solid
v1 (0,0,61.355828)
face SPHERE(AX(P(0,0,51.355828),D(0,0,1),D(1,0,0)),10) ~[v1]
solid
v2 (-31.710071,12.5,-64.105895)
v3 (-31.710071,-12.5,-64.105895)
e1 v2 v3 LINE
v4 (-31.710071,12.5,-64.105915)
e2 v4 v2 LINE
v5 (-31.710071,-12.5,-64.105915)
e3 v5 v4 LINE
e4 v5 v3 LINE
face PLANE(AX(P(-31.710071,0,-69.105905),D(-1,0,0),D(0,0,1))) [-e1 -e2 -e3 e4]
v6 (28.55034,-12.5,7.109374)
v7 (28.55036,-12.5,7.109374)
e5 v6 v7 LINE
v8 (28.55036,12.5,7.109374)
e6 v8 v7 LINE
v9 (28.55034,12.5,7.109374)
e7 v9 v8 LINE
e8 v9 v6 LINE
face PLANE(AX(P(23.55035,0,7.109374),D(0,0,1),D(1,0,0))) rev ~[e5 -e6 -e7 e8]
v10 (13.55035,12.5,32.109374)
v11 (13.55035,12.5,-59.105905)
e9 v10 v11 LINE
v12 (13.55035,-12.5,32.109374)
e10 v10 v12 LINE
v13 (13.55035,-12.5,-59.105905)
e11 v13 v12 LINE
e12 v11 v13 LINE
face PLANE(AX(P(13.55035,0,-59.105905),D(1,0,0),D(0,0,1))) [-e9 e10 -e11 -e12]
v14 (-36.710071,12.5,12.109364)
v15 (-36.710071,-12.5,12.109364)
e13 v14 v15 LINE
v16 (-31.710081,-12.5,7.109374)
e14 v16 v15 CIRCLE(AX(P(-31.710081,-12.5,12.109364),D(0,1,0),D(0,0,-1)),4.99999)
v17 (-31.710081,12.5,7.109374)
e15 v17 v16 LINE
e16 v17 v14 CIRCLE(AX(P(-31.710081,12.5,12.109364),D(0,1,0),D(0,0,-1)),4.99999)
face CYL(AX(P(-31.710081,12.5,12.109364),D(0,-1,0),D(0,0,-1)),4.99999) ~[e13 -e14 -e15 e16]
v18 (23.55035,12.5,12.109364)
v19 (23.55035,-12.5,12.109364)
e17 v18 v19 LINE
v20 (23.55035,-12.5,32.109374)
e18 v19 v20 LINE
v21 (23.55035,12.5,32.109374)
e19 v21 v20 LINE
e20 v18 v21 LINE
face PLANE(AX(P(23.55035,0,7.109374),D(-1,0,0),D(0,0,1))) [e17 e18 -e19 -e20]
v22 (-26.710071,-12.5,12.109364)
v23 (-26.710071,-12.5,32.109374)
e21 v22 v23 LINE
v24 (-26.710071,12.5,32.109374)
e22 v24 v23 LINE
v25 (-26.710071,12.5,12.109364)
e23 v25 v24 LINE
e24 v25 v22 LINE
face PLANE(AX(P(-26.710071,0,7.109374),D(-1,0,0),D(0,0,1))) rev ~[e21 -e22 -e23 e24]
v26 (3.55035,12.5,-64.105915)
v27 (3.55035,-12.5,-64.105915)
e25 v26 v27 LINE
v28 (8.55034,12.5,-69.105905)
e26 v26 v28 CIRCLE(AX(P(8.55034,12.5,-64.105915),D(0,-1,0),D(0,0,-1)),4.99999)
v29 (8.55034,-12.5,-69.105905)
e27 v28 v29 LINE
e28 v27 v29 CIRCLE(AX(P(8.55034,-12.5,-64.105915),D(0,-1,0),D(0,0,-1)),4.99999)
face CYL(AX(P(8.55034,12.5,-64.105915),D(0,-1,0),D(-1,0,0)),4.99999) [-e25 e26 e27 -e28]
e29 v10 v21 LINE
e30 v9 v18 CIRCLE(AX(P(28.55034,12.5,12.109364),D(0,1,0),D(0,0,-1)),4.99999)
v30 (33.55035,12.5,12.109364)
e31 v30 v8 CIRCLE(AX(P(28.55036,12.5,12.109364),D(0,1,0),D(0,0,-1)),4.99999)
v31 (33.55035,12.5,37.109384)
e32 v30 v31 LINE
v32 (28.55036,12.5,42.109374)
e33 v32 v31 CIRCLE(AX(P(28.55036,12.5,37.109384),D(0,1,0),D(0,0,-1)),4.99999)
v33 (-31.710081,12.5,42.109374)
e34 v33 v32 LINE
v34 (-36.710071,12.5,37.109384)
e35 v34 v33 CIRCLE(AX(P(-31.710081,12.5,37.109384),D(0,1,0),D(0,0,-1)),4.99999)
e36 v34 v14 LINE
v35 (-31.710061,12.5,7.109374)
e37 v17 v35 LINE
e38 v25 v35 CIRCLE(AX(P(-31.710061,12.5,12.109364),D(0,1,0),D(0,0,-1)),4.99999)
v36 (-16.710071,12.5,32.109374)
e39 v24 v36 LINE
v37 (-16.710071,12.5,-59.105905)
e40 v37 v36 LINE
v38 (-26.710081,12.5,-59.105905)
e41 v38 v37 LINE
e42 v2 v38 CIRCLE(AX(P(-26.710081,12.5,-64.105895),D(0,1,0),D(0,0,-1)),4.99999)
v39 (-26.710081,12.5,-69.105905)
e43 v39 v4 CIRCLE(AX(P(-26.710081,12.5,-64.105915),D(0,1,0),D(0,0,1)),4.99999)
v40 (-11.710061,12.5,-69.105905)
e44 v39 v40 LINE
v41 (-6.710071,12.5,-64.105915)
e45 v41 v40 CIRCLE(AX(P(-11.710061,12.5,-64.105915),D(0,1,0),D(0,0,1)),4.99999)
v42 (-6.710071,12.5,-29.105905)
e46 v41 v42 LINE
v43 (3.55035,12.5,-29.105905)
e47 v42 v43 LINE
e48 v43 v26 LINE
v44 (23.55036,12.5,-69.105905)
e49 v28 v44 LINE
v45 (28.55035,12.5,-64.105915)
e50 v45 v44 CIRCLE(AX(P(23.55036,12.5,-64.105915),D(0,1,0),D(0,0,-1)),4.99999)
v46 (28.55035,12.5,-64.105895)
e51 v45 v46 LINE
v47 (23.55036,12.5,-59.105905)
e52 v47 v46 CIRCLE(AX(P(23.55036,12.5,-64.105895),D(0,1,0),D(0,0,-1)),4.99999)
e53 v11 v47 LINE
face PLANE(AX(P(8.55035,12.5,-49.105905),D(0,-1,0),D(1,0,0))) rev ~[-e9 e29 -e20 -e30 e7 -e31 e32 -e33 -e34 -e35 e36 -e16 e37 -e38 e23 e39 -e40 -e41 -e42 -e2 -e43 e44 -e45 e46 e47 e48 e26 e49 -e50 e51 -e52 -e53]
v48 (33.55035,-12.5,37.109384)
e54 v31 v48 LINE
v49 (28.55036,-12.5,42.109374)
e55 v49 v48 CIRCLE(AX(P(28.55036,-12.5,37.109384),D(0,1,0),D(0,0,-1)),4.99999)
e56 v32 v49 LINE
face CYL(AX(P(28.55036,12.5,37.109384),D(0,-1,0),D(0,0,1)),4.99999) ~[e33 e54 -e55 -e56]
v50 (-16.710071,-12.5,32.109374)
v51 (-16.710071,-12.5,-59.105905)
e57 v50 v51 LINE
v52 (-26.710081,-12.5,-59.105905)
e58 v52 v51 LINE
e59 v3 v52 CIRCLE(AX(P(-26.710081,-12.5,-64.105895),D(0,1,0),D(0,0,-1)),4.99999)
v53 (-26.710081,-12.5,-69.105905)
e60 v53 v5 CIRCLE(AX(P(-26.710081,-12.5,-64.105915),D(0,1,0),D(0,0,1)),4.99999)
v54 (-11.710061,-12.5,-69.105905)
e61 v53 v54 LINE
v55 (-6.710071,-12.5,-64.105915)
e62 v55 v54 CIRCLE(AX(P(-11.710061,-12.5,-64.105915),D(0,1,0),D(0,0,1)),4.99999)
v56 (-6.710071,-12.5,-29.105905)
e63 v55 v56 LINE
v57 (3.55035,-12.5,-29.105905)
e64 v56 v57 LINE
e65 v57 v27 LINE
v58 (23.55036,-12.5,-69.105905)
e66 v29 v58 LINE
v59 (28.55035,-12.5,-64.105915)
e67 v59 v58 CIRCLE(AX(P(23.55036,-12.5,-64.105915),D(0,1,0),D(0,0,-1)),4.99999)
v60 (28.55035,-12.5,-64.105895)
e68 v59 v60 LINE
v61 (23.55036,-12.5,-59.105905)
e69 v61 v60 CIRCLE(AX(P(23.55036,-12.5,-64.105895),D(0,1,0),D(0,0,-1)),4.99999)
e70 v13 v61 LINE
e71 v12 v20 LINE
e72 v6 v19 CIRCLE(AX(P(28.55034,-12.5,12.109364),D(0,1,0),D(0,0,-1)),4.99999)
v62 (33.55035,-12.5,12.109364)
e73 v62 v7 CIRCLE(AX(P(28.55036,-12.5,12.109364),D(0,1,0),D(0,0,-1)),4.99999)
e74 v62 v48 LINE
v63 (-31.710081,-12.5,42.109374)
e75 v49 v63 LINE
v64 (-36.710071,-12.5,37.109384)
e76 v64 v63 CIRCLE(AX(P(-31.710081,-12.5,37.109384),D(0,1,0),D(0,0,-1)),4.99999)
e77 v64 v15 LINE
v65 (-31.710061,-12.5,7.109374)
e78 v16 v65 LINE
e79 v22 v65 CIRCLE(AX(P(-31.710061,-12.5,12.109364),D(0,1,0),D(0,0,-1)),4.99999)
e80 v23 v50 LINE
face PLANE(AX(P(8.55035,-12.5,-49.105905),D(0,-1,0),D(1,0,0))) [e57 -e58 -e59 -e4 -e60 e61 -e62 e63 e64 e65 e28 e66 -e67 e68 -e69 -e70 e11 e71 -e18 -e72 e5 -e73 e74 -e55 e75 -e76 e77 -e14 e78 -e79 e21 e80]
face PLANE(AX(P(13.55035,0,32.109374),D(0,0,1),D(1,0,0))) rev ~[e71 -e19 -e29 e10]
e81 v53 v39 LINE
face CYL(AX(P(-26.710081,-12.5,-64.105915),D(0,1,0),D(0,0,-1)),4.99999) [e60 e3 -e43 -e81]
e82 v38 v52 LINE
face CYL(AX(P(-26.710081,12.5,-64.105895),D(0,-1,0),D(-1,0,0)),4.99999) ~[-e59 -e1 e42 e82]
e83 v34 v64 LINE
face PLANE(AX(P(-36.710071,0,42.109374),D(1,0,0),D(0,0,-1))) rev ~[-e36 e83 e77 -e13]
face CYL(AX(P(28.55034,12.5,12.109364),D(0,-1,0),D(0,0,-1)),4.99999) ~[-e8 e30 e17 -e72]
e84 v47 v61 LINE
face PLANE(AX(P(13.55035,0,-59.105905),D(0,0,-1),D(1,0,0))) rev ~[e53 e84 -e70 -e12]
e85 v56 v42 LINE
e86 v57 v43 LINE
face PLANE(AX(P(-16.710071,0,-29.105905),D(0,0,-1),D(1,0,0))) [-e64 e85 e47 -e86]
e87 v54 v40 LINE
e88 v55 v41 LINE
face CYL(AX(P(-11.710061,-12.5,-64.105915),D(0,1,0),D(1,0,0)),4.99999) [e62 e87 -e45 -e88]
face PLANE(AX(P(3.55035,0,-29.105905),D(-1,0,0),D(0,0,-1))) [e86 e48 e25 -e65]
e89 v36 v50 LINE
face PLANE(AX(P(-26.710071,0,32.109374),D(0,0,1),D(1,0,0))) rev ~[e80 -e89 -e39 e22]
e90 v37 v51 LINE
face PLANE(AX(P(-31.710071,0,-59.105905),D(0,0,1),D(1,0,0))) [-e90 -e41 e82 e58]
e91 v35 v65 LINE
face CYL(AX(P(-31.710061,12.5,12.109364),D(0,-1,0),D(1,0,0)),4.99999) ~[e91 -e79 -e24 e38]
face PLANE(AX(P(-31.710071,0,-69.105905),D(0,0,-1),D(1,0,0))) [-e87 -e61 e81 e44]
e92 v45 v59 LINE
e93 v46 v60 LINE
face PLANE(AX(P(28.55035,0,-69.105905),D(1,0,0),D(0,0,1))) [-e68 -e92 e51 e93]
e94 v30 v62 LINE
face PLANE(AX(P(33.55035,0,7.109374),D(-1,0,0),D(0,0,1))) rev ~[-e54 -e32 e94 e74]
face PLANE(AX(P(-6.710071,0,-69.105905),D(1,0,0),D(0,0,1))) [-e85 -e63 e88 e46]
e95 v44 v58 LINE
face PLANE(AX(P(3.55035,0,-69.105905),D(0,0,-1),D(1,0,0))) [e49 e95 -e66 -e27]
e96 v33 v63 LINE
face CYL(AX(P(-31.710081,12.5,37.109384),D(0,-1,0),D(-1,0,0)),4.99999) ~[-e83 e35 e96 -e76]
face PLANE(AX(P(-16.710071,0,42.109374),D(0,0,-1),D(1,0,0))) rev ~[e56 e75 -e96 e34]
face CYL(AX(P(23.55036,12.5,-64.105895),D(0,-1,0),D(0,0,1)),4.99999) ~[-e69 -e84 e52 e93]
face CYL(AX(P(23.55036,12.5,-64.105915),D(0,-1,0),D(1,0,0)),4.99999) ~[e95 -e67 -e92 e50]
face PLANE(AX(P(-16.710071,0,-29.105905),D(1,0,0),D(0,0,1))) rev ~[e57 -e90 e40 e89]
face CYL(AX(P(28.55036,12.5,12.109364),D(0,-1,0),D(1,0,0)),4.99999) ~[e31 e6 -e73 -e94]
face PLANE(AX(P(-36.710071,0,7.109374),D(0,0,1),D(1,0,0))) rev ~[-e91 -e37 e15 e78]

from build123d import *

# Parameters (mm, degrees)
F0_W          = 30.2604204044
F0_H          = 71.2152794003
F1_DEPTH      = 12.5
F1_DEPTH_BACK = 12.5
F4_W          = 15
F4_H          = 10
F4_W_2        = 10
F4_H_2        = 25
F5_DEPTH      = 12.5
F5_DEPTH_BACK = 12.5
F6_R          = 4.99999


# Not quite as in the source:
# - a fillet or chamfer is up to 0.001 mm smaller than in the source, because OpenCascade refuses the exact size


with BuildPart() as f1:
    # F0 (on Front) → F1 (new body, two sides)
    with BuildSketch(Plane.XZ) as f1_sk:
        with Locations((-1.579860691, 6.5017342567)):
            Rectangle(F0_W, F0_H)
    extrude(amount=F1_DEPTH)
    extrude(f1_sk.sketch, amount=-F1_DEPTH_BACK)

    # F4 (on Front) → F5 (join, two sides)
    with BuildSketch(Plane.XZ) as f5_sk:
        Polygon((13.5503495112, -29.1059054434), (3.5503495112, -29.1059054434), (3.5503495112, -69.1059054434), (13.5503495112, -69.1059054434), (13.5503495112, -59.1059054434), align=None)
        with Locations((21.0503495112, -64.1059054434)):
            Rectangle(F4_W, F4_H)
        Polygon((-6.7100708932, -69.1059054434), (-6.7100708932, -29.1059054434), (-16.7100708932, -29.1059054434), (-16.7100708932, -59.1059054434), (-16.7100708932, -69.1059054434), align=None)
        with Locations((-24.2100708932, -64.1059054434)):
            Rectangle(F4_W, F4_H)
        Polygon((-16.7100708932, 32.1093739569), (-16.7100708932, 42.1093739569), (-36.7100708932, 42.1093739569), (-36.7100708932, 32.1093739569), (-26.7100708932, 32.1093739569), align=None)
        with Locations((-31.7100708932, 19.6093739569)):
            Rectangle(F4_W_2, F4_H_2)
        Polygon((33.5503495112, 42.1093739569), (13.5503495112, 42.1093739569), (13.5503495112, 32.1093739569), (23.5503495112, 32.1093739569), (33.5503495112, 32.1093739569), align=None)
        with Locations((28.5503495112, 19.6093739569)):
            Rectangle(F4_W_2, F4_H_2)
    extrude(amount=F5_DEPTH)
    extrude(f5_sk.sketch, amount=-F5_DEPTH_BACK)

    # F6 (radius 5 in the source; OpenCascade refuses exactly that, so slightly less here)
    f6_edges = [f1.edges().sort_by_distance(p)[0] for p in [
        (-36.710071, 0, 42.109374),
        (33.55035, 0, 42.109374),
        (-6.710071, 0, -69.105905),
        (3.55035, 0, -69.105905),
        (-36.710071, 0, 7.109374),
        (23.55035, 0, 7.109374),
        (-31.710071, 0, -69.105905),
        (-31.710071, 0, -59.105905),
        (-26.710071, 0, 7.109374),
        (33.55035, 0, 7.109374),
        (28.55035, 0, -59.105905),
        (28.55035, 0, -69.105905),
    ]]
    fillet(f6_edges, radius=F6_R)


with BuildPart() as f3:
    # F2 (on Front) → F3 (revolve)
    with BuildSketch(Plane.XZ):
        with BuildLine():
            ThreePointArc((0, 41.3558275998), (10, 51.3558275998), (0, 61.3558275998))
            Line((0, 61.3558275998), (0, 41.3558275998))
        make_face()
    revolve(axis=Axis((0, 0, 51.3558275998), (0, 0, -1)))


solid = Compound([f1.part, f3.part])
